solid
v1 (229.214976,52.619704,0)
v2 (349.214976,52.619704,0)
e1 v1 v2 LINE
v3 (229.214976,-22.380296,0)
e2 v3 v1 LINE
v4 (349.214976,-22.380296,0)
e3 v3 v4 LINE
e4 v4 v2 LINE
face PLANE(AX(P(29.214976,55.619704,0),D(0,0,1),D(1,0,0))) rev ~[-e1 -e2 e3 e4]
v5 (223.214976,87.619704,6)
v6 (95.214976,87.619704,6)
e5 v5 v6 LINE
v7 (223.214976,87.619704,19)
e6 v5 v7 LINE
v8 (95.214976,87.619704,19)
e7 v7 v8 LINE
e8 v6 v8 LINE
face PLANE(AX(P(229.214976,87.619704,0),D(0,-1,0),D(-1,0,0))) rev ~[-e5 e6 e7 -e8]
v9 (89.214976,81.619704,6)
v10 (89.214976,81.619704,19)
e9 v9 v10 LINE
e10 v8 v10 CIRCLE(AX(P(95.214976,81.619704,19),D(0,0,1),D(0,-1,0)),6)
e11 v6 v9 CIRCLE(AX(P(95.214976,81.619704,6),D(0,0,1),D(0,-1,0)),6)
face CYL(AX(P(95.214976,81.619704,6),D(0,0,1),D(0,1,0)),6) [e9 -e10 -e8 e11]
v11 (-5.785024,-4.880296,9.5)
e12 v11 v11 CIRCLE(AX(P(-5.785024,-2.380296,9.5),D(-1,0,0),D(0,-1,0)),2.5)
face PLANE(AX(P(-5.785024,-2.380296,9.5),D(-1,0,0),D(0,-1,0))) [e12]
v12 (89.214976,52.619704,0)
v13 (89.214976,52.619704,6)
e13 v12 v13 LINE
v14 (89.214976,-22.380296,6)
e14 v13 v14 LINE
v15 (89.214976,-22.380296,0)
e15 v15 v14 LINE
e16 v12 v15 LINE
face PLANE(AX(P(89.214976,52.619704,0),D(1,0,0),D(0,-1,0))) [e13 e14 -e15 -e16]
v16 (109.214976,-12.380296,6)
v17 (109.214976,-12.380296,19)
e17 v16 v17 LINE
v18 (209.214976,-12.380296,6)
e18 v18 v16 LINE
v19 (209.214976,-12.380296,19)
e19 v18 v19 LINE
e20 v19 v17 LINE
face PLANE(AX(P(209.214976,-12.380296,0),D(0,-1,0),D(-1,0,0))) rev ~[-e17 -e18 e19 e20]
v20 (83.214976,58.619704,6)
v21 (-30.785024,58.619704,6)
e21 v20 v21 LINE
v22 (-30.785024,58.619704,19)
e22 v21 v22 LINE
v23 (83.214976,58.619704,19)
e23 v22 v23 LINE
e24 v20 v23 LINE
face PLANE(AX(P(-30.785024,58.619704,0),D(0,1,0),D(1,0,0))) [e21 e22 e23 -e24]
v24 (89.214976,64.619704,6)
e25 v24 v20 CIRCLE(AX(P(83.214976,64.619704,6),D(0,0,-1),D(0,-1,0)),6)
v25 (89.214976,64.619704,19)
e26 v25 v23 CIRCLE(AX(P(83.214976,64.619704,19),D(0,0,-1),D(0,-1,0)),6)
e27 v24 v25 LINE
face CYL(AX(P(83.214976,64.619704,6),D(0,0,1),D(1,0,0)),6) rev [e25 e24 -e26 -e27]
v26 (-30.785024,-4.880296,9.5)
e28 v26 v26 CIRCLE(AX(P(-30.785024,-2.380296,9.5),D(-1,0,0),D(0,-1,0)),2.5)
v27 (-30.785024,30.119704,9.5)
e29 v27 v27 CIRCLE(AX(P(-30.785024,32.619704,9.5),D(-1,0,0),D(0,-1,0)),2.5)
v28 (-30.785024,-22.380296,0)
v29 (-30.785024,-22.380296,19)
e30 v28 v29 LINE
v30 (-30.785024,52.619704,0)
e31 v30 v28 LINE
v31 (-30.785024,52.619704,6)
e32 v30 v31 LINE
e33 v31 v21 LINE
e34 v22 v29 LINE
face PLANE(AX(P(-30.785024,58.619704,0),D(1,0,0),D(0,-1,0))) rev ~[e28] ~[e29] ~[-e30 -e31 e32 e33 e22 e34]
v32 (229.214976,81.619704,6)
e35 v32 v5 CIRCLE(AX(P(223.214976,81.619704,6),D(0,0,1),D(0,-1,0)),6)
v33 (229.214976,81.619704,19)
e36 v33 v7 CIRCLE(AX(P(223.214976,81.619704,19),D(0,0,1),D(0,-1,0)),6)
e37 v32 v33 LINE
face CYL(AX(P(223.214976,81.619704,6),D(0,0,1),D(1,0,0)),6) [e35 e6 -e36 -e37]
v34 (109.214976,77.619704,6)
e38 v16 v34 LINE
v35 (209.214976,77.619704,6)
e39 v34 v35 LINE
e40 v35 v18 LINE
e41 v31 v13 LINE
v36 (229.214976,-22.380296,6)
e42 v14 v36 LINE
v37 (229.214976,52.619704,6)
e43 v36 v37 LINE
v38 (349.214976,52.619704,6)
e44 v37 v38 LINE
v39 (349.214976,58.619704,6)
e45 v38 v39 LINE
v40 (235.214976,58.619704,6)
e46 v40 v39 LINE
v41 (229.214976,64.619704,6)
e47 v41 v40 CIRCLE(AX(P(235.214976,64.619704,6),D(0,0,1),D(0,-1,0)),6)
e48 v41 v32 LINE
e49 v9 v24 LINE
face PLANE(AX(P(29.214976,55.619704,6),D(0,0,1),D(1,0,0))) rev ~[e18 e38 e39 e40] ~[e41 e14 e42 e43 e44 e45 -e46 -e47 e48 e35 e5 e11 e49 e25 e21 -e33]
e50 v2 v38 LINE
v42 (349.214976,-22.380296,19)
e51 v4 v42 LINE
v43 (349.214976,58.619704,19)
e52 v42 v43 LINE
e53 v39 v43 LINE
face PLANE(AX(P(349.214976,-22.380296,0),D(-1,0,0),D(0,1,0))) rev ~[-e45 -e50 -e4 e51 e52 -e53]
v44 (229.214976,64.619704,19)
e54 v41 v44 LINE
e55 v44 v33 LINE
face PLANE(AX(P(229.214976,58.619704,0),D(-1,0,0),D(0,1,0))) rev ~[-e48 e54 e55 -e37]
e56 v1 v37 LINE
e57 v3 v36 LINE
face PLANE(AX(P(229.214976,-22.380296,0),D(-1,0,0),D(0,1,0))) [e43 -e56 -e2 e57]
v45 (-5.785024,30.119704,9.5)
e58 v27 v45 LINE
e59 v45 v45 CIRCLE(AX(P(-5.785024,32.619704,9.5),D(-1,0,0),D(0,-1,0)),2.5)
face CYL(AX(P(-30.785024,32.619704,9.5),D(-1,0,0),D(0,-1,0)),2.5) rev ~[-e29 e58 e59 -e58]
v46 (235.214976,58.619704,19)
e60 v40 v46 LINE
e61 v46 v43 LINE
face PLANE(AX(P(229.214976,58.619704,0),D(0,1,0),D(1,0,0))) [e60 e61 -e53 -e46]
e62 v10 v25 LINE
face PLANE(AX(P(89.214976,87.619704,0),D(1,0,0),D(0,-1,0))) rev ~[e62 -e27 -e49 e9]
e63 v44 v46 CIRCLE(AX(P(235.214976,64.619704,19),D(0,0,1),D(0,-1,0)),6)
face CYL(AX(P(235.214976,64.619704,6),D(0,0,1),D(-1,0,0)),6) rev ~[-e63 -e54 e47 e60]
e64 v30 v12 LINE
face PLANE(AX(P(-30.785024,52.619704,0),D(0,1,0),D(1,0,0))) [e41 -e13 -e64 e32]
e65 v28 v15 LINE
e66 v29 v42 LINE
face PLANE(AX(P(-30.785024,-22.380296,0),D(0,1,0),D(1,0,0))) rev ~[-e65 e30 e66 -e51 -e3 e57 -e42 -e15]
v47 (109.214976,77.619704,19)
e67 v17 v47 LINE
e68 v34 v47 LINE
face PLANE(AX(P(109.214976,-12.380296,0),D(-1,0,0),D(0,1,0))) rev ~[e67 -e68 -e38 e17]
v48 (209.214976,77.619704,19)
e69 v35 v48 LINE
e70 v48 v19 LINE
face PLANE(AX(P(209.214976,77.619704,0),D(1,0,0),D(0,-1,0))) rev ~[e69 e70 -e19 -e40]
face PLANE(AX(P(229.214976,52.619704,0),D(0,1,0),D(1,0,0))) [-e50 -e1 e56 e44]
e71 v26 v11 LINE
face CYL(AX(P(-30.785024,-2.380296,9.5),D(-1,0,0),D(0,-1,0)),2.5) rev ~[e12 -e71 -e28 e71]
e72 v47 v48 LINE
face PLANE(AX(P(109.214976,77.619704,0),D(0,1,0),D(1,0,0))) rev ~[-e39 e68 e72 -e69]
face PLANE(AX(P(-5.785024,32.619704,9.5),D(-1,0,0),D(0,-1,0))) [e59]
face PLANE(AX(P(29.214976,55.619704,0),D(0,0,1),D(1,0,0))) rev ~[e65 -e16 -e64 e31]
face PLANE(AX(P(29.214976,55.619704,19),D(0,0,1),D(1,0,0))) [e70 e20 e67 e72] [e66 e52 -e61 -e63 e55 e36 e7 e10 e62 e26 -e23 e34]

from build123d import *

# Parameters (mm, degrees)
F0_W     = 120
F0_H     = 6
F0_W_2   = 6
F0_H_2   = 23
F0_H_3   = 75
F1_DEPTH = 19
F2_DEPTH = 6
F3_R     = 6
F4_R     = 2.5
F5_DEPTH = 25


with BuildPart() as f1:
    # F0 (on Top) → F1 (new body)
    with BuildSketch(Plane.XY):
        with Locations((29.2149764299, 55.6197040975)):
            Rectangle(F0_W, F0_H)
        with Locations((92.2149764299, 70.1197040975)):
            Rectangle(F0_W_2, F0_H_2)
        with Locations((92.2149764299, 55.6197040975)):
            Rectangle(F0_W_2, F0_H)
        with Locations((29.2149764299, 15.1197040975)):
            Rectangle(F0_W, F0_H_3)
        Polygon((109.2149764299, 58.6197040975), (95.2149764299, 58.6197040975), (95.2149764299, 52.6197040975), (89.2149764299, 52.6197040975), (89.2149764299, -22.3802959025), (159.2149764299, -22.3802959025), (159.2149764299, -12.3802959025), (109.2149764299, -12.3802959025), align=None)
        Polygon((89.2149764299, 87.6197040975), (89.2149764299, 81.6197040975), (95.2149764299, 81.6197040975), (159.2149764299, 81.6197040975), (159.2149764299, 87.6197040975), align=None)
        Polygon((159.2149764299, 87.6197040975), (159.2149764299, 81.6197040975), (223.2149764299, 81.6197040975), (229.2149764299, 81.6197040975), (229.2149764299, 87.6197040975), align=None)
        Polygon((159.2149764299, -12.3802959025), (159.2149764299, -22.3802959025), (229.2149764299, -22.3802959025), (229.2149764299, 52.6197040975), (229.2137485743, 52.6197040975), (223.2149764299, 52.6197040975), (223.2149764299, 58.6197040975), (209.2149764299, 58.6197040975), (209.2149764299, -12.3802959025), align=None)
        with Locations((226.2149764299, 70.1197040975)):
            Rectangle(F0_W_2, F0_H_2)
        with Locations((289.2149764299, 15.1197040975)):
            Rectangle(F0_W, F0_H_3)
        Polygon((229.2149764299, 58.6197040975), (223.2149764299, 58.6197040975), (223.2149764299, 52.6197040975), (229.2137485743, 52.6197040975), (229.2149764299, 52.6197040975), align=None)
        with Locations((289.2149764299, 55.6197040975)):
            Rectangle(F0_W, F0_H)
        Polygon((95.2149764299, 81.6197040975), (95.2149764299, 58.6197040975), (109.2149764299, 58.6197040975), (109.2149764299, 77.6197040975), (159.2149764299, 77.6197040975), (159.2149764299, 81.6197040975), align=None)
        Polygon((223.2149764299, 81.6197040975), (159.2149764299, 81.6197040975), (159.2149764299, 77.6197040975), (209.2149764299, 77.6197040975), (209.2149764299, 58.6197040975), (223.2149764299, 58.6197040975), align=None)
    extrude(amount=F1_DEPTH)

    # F0 (on Top) → F2 (cut)
    with BuildSketch(Plane.XY):
        with Locations((29.2149764299, 55.6197040975)):
            Rectangle(F0_W, F0_H)
        with Locations((92.2149764299, 55.6197040975)):
            Rectangle(F0_W_2, F0_H)
        with Locations((289.2149764299, 55.6197040975)):
            Rectangle(F0_W, F0_H)
        with Locations((92.2149764299, 70.1197040975)):
            Rectangle(F0_W_2, F0_H_2)
        Polygon((89.2149764299, 87.6197040975), (89.2149764299, 81.6197040975), (95.2149764299, 81.6197040975), (159.2149764299, 81.6197040975), (159.2149764299, 87.6197040975), align=None)
        Polygon((159.2149764299, 87.6197040975), (159.2149764299, 81.6197040975), (223.2149764299, 81.6197040975), (229.2149764299, 81.6197040975), (229.2149764299, 87.6197040975), align=None)
        with Locations((226.2149764299, 70.1197040975)):
            Rectangle(F0_W_2, F0_H_2)
        Polygon((229.2149764299, 58.6197040975), (223.2149764299, 58.6197040975), (223.2149764299, 52.6197040975), (229.2137485743, 52.6197040975), (229.2149764299, 52.6197040975), align=None)
        Polygon((159.2149764299, -12.3802959025), (159.2149764299, -22.3802959025), (229.2149764299, -22.3802959025), (229.2149764299, 52.6197040975), (229.2137485743, 52.6197040975), (223.2149764299, 52.6197040975), (223.2149764299, 58.6197040975), (209.2149764299, 58.6197040975), (209.2149764299, -12.3802959025), align=None)
        Polygon((109.2149764299, 58.6197040975), (95.2149764299, 58.6197040975), (95.2149764299, 52.6197040975), (89.2149764299, 52.6197040975), (89.2149764299, -22.3802959025), (159.2149764299, -22.3802959025), (159.2149764299, -12.3802959025), (109.2149764299, -12.3802959025), align=None)
        Polygon((223.2149764299, 81.6197040975), (159.2149764299, 81.6197040975), (159.2149764299, 77.6197040975), (209.2149764299, 77.6197040975), (209.2149764299, 58.6197040975), (223.2149764299, 58.6197040975), align=None)
        Polygon((95.2149764299, 81.6197040975), (95.2149764299, 58.6197040975), (109.2149764299, 58.6197040975), (109.2149764299, 77.6197040975), (159.2149764299, 77.6197040975), (159.2149764299, 81.6197040975), align=None)
    extrude(amount=F2_DEPTH, mode=Mode.SUBTRACT)

    # F3
    f3_edges = [f1.edges().sort_by_distance(p)[0] for p in [
        (229.214976, 58.619704, 12.5),
        (229.214976, 87.619704, 12.5),
        (89.214976, 87.619704, 12.5),
        (89.214976, 58.619704, 12.5),
    ]]
    fillet(f3_edges, radius=F3_R)

    # F4 (on face) → F5 (cut)
    with BuildSketch(Plane(origin=(-30.7850235701, 0, 0), x_dir=(0, -1, 0), z_dir=(-1, 0, 0))):
        with Locations((-32.6197040975, 9.5)):
            Circle(F4_R)
        with Locations((2.3802959025, 9.5)):
            Circle(F4_R)
    extrude(amount=-F5_DEPTH, mode=Mode.SUBTRACT)


solid = f1.part
